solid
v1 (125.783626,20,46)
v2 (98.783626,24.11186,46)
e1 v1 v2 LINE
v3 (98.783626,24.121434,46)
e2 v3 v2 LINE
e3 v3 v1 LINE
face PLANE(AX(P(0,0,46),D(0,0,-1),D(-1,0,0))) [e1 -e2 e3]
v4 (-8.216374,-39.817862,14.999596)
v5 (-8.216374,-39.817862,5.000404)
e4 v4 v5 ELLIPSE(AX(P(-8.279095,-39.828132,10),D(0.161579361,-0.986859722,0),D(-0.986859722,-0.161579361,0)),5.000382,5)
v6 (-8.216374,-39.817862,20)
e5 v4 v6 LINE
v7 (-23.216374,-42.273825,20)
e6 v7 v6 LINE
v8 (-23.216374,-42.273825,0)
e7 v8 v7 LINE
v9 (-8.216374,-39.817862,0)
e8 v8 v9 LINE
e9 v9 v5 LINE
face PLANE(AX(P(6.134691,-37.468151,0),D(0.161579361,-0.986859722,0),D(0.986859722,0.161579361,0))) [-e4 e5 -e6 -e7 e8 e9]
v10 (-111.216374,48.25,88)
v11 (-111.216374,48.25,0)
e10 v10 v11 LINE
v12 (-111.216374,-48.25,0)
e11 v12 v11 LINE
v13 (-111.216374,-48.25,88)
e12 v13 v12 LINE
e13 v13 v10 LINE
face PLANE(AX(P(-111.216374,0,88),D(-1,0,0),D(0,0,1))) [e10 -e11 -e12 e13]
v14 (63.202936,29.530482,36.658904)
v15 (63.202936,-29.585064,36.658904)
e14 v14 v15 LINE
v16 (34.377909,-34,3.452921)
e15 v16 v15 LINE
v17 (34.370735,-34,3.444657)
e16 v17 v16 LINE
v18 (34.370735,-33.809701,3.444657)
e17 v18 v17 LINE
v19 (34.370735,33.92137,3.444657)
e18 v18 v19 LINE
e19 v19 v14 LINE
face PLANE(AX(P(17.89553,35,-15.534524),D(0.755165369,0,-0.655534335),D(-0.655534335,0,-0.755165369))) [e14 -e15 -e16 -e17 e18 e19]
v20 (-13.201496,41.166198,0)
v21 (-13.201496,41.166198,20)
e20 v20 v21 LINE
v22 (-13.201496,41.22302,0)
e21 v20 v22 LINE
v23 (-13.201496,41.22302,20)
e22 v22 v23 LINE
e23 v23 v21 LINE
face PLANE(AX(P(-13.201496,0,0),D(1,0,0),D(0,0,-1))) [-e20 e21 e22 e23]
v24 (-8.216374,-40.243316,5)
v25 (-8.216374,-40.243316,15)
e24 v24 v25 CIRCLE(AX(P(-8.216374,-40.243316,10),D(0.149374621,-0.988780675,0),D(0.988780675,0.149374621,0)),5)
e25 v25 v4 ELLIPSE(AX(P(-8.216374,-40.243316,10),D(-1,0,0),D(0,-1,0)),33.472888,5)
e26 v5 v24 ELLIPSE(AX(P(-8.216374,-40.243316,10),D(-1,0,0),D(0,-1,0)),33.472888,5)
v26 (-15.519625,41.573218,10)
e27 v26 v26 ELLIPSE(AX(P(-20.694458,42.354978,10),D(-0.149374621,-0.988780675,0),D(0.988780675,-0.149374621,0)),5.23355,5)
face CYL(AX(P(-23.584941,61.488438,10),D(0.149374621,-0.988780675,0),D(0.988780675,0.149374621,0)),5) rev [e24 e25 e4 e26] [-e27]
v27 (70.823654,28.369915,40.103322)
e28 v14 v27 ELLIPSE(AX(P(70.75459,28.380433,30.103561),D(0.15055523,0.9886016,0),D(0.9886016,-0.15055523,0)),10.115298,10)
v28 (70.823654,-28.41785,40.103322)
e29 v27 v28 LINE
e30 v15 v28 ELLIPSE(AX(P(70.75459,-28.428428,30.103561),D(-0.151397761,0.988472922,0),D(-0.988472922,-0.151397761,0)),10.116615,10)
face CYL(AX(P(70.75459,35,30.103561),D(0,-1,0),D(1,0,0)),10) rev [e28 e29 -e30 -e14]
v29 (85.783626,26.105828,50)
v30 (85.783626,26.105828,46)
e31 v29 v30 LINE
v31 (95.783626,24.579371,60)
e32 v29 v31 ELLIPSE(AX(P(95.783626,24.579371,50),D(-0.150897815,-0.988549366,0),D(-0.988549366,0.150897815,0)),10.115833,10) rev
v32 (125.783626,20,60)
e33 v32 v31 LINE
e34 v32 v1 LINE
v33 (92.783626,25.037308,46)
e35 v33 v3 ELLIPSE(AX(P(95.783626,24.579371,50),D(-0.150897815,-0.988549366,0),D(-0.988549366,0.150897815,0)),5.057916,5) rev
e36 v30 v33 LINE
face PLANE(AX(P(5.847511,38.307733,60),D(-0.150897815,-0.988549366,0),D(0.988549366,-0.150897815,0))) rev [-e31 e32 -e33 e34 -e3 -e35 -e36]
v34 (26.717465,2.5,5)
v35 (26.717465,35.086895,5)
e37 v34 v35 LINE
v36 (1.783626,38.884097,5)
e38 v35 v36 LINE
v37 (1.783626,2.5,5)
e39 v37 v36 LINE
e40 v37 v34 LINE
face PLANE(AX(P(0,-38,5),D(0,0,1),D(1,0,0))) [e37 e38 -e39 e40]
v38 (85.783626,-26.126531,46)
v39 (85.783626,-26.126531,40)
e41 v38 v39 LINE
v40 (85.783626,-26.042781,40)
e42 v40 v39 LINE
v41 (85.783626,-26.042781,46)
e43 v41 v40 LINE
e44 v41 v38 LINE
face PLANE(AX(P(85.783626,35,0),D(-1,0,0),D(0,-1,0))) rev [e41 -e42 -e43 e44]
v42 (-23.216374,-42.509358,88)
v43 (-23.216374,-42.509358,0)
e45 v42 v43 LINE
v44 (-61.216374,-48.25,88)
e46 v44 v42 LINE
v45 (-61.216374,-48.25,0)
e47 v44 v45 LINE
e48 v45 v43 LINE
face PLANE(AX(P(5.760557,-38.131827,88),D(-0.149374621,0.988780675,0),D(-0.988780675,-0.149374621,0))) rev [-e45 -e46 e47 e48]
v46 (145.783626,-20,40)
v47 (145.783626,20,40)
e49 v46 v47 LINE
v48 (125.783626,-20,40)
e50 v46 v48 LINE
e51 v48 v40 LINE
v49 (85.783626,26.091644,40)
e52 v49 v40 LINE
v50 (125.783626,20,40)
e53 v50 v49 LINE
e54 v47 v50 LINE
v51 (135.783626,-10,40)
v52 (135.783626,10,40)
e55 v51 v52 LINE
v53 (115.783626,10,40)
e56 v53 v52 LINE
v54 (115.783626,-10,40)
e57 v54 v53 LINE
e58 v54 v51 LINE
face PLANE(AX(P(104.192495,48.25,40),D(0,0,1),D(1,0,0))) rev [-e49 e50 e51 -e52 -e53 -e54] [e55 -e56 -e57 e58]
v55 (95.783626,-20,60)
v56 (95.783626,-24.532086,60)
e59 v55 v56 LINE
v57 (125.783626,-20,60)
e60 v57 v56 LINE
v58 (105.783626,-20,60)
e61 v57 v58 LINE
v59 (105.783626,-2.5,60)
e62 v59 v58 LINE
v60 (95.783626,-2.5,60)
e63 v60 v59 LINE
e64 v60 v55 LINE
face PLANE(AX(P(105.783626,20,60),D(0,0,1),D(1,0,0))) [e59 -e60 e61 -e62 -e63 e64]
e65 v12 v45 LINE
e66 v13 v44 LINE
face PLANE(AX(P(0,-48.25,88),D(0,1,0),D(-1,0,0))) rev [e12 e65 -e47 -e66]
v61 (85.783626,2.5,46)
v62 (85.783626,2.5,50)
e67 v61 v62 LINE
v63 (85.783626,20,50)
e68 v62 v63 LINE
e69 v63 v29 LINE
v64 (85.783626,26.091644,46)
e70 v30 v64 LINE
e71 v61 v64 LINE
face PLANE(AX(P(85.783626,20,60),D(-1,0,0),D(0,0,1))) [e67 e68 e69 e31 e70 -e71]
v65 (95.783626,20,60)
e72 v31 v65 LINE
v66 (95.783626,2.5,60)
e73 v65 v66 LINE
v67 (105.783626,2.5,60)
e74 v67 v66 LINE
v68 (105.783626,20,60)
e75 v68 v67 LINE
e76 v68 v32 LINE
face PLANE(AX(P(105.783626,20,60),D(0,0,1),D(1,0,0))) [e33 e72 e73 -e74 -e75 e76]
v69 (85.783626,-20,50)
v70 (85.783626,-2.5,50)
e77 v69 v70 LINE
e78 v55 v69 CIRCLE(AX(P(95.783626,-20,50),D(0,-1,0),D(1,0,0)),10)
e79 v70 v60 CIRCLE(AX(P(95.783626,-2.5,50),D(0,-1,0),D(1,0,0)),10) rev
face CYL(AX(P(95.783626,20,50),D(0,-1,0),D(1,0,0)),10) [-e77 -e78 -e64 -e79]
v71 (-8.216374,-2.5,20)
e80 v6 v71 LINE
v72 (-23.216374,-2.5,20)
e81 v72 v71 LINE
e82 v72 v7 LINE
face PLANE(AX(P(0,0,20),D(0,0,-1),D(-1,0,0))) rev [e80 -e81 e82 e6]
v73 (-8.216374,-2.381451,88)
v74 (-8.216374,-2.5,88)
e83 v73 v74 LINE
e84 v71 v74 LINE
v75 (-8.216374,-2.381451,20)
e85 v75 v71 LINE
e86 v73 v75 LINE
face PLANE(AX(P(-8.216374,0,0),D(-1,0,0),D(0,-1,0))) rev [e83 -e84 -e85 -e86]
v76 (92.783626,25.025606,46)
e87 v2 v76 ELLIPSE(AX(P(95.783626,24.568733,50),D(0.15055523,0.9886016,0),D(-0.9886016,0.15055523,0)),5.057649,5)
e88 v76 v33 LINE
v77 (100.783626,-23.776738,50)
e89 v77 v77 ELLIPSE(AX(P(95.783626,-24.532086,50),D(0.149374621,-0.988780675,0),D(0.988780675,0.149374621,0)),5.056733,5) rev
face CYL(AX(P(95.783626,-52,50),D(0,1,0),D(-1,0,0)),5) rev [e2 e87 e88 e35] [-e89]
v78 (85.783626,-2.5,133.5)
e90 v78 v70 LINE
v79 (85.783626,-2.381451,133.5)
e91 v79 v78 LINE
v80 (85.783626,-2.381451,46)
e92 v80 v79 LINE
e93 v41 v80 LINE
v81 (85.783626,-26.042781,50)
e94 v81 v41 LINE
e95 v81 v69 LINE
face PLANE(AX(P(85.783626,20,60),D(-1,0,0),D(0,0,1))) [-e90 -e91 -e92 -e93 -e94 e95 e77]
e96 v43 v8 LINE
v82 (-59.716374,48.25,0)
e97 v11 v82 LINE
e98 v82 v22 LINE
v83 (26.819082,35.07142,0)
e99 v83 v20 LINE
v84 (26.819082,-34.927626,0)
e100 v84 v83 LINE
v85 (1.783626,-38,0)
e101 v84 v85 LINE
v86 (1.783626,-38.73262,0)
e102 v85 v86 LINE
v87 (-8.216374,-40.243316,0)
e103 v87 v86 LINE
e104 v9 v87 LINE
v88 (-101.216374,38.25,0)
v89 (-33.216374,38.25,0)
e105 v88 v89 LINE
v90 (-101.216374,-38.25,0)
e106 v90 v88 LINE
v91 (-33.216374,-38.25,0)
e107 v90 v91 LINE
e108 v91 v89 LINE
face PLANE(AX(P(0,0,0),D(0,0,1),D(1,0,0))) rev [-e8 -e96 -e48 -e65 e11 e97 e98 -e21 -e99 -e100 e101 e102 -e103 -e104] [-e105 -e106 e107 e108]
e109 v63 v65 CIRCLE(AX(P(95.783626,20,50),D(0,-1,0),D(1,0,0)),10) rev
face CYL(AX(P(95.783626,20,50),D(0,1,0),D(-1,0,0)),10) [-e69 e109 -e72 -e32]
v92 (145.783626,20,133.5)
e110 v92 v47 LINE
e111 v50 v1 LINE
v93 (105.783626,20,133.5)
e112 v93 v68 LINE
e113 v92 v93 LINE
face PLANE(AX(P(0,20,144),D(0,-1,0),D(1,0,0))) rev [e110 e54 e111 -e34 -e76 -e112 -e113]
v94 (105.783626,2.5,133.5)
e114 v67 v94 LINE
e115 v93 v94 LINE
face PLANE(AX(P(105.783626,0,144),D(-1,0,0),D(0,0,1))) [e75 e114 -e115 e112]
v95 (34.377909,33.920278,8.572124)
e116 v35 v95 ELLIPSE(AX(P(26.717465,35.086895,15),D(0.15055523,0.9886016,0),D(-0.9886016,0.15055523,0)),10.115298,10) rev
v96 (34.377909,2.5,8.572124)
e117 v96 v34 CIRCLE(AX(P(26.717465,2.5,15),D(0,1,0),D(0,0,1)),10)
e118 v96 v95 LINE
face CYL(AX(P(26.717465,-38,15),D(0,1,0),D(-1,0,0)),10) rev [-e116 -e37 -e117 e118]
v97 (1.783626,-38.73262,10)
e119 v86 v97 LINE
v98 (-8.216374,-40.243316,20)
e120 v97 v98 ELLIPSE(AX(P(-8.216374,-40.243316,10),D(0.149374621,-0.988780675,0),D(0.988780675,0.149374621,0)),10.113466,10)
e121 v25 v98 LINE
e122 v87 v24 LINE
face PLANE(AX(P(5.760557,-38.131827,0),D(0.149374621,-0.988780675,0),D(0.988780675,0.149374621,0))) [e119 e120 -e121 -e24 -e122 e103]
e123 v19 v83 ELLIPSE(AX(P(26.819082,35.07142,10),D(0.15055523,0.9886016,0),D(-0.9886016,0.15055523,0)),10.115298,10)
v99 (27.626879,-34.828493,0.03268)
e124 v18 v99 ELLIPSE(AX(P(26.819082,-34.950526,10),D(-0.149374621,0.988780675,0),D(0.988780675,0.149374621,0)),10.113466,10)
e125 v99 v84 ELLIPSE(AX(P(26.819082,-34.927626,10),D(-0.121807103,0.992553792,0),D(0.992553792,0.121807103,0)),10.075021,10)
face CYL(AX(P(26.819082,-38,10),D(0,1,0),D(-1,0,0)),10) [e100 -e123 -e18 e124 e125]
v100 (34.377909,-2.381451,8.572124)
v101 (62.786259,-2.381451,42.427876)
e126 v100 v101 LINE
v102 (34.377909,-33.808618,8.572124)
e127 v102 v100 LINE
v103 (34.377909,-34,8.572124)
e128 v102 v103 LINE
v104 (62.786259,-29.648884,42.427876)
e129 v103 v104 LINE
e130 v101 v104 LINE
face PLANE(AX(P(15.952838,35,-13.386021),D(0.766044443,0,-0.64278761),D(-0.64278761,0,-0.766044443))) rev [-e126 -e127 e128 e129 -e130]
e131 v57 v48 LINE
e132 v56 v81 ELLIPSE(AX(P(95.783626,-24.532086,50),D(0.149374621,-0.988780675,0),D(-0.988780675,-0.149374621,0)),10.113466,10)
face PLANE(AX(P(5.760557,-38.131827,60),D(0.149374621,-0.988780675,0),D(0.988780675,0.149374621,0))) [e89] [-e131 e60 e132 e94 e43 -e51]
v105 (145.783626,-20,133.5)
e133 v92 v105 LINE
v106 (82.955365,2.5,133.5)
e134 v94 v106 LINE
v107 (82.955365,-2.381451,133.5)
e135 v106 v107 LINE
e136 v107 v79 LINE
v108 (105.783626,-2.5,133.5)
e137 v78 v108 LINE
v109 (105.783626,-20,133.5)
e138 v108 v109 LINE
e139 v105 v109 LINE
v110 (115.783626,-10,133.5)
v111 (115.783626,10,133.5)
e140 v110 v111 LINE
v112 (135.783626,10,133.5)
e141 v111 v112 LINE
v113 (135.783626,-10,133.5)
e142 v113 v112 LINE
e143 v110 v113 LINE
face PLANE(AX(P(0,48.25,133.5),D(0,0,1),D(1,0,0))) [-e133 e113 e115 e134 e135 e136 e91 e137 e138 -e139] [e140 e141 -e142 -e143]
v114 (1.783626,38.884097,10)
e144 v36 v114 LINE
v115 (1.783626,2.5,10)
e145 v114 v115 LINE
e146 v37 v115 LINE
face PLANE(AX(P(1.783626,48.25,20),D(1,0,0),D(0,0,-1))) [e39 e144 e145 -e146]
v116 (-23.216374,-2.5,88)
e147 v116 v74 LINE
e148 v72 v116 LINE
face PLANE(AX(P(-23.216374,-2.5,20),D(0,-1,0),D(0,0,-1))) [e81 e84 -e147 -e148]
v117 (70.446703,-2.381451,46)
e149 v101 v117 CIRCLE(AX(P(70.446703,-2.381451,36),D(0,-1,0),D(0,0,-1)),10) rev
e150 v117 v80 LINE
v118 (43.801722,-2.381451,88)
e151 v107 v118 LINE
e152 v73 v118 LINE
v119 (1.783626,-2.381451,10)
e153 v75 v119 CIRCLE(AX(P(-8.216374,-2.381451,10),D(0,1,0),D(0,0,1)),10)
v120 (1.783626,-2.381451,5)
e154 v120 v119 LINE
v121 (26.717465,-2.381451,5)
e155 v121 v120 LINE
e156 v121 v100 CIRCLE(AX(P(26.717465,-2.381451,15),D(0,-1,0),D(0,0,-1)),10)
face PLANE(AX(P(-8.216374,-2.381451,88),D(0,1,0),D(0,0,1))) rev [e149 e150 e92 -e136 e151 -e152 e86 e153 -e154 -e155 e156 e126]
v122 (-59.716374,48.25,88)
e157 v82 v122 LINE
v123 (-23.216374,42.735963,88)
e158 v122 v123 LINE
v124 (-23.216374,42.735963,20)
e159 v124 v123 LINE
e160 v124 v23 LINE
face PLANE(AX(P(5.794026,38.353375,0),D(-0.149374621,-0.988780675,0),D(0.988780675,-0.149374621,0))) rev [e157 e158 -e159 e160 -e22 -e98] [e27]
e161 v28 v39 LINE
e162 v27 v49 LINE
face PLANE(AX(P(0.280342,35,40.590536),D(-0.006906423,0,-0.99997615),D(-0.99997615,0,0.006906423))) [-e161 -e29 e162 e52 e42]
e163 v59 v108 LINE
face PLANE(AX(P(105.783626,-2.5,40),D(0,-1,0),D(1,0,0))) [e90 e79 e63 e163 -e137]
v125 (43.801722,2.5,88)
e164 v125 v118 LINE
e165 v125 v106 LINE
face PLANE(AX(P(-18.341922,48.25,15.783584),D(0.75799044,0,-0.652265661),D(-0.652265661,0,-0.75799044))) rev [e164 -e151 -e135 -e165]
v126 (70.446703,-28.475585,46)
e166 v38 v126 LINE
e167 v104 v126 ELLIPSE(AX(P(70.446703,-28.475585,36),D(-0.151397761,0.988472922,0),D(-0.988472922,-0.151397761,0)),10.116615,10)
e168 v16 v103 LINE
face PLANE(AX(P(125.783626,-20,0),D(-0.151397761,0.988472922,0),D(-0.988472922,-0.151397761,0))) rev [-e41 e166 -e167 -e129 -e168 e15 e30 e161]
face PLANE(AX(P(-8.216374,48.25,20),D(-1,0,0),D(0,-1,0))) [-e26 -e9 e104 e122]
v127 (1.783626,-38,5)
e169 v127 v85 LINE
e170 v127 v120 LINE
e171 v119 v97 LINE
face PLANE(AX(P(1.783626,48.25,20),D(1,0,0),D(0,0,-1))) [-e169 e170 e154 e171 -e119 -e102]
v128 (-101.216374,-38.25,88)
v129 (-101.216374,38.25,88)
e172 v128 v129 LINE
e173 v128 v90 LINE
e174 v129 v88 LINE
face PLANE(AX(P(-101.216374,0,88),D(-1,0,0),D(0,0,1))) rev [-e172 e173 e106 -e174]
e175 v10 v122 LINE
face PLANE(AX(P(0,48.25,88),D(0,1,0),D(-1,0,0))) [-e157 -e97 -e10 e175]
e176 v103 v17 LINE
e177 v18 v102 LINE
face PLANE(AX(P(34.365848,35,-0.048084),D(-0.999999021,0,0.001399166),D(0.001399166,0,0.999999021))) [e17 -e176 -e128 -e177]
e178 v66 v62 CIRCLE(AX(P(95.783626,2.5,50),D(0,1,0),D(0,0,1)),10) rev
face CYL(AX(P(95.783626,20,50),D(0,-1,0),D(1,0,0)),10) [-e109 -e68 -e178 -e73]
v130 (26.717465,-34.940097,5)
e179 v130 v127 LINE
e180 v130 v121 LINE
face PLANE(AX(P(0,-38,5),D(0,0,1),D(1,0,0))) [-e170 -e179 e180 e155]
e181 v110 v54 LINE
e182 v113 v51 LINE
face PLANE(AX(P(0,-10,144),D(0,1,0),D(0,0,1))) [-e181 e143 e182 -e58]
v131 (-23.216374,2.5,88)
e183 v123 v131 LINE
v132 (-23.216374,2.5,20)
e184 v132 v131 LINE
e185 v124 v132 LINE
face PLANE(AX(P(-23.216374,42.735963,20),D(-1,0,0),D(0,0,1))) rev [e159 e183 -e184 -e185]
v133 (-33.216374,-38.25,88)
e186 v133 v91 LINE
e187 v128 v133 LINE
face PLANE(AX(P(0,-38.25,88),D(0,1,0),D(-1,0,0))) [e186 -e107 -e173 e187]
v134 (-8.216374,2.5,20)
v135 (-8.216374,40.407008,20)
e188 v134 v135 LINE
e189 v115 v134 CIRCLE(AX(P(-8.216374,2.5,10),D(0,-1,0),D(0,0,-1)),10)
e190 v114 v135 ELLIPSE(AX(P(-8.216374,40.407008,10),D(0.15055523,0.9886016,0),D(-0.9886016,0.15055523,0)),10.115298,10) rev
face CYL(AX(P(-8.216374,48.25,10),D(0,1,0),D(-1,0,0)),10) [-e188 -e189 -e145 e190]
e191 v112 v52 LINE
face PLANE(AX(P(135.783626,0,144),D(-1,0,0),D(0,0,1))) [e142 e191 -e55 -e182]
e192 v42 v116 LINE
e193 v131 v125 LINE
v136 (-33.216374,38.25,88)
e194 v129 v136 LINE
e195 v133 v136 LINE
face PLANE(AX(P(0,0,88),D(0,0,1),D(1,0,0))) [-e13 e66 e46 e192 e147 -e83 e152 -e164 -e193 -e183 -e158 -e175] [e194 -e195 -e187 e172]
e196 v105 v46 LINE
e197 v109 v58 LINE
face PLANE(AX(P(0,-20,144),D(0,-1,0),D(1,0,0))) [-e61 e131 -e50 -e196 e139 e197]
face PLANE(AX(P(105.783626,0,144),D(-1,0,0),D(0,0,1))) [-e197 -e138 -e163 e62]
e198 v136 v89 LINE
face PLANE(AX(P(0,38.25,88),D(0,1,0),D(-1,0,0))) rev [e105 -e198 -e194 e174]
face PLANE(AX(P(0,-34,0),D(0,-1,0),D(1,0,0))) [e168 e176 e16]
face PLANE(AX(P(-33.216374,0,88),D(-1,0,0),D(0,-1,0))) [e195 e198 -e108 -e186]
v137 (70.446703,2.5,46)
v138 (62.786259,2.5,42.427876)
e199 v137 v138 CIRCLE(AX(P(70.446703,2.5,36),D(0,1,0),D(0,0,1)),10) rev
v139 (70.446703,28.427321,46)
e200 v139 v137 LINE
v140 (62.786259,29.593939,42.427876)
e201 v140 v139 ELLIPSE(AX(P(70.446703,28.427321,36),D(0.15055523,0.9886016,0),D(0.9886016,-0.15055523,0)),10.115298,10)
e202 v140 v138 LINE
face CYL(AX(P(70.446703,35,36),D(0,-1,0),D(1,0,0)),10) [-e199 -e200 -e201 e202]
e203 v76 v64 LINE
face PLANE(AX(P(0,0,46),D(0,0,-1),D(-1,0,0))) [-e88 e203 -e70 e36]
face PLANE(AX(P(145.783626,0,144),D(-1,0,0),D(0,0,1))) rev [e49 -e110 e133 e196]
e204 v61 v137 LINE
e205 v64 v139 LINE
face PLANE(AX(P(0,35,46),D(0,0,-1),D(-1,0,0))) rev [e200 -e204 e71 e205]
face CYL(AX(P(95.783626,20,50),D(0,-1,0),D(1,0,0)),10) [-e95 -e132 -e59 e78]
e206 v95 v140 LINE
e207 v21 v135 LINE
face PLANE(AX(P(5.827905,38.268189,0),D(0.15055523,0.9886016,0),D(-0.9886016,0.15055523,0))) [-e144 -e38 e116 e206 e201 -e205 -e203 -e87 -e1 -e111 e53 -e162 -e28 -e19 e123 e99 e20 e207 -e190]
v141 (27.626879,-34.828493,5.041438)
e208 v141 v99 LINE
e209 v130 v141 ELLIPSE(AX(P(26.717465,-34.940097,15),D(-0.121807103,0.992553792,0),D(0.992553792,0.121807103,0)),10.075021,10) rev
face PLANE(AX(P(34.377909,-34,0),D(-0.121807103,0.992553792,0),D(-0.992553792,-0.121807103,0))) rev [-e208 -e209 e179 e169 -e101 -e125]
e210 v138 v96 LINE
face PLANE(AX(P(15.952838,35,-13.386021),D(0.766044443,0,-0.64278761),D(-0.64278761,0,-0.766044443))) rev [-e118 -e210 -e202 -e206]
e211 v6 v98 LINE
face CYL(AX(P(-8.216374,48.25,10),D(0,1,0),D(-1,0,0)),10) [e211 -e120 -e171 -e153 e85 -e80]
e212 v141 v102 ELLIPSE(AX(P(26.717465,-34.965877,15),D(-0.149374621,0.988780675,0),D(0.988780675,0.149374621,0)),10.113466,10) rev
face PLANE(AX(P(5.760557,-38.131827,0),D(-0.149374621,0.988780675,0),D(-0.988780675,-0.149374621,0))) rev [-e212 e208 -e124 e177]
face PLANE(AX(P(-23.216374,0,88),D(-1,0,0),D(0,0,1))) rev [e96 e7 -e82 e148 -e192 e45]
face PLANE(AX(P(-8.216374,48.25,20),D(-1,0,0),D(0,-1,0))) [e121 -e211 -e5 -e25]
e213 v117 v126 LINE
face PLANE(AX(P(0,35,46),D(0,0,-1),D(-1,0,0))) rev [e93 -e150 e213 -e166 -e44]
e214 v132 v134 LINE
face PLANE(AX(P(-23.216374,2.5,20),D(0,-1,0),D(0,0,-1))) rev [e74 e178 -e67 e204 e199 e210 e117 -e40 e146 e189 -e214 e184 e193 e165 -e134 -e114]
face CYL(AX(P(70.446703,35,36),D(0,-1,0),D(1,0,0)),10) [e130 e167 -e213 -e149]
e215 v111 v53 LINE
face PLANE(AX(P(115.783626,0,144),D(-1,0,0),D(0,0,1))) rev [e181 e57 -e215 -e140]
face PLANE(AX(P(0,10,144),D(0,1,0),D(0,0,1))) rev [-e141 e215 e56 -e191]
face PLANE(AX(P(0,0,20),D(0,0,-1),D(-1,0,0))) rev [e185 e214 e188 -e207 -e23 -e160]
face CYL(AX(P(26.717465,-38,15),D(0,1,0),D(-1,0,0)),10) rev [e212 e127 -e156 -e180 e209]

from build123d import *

# Parameters (mm, degrees)
ESQUISSE1_W                   = 68
ESQUISSE1_H                   = 76.5
BOSS_EXTRU_1_DEPTH            = 88
BOSS_EXTRU_4_DEPTH            = 88
ESQUISSE3_W                   = 19.543482411
ESQUISSE3_H                   = 40.235962567
ESQUISSE3_W_2                 = 20.972353068
ESQUISSE3_H_2                 = 40.009358289
ENL_V_MAT_EXTRU_1_DEPTH       = 68
ESQUISSE8_W                   = 10
ESQUISSE8_H                   = 20
BOSS_EXTRU_9_DEPTH            = 96.5
ENL_V_MAT_EXTRU_2_DEPTH       = 140.000518873
ESQUISSE10_R                  = 5
ENL_V_MAT_EXTRU_3_DEPTH       = 170.968886377
ESQUISSE17_W                  = 10
ESQUISSE17_H                  = 4.881451094
BOSS_EXTRU_16_DEPTH           = 68
CONG_2_R                      = 10
BOSS_EXTRU_19_DEPTH           = 56
BOSS_EXTRU_19_DEPTH_BACK      = 85
ESQUISSE19_W                  = 40
ESQUISSE19_H                  = 40
ESQUISSE19_W_2                = 20
ESQUISSE19_H_2                = 20
ESQUISSE20_W                  = 60
ESQUISSE20_H                  = 40
ENL_V_MAT_EXTRU_4_DEPTH       = 216.978999532
ESQUISSE21_W                  = 40
ESQUISSE21_H                  = 10.5
ENL_V_MAT_EXTRU_5_DEPTH       = 216.978999532
ESQUISSE22_W                  = 10
ESQUISSE22_H                  = 20
BOSS_EXTRU_23_DEPTH           = 40
ESQUISSE23_W                  = 10
ESQUISSE23_H                  = 5
BOSS_EXTRU_24_DEPTH           = 93.5
ESQUISSE24_W                  = 10
ESQUISSE24_H                  = 20
BOSS_EXTRU_25_DEPTH           = 40
ESQUISSE25_W                  = 10
ESQUISSE25_H                  = 5
BOSS_EXTRU_26_DEPTH           = 83.5
ESQUISSE26_W                  = 10
ESQUISSE26_H                  = 10
ENL_V_MAT_EXTRU_6_DEPTH       = 211.762136635
CONG_3_R                      = 10
CONG_4_R                      = 10
BOSS_EXTRU_30_DEPTH           = 18
BOSS_EXTRU_30_DEPTH_BACK      = 59
ENL_V_MAT_EXTRU_9_DEPTH       = 180.786479578
BOSS_EXTRU_33_DEPTH           = 20
CONG_8_R                      = 10
ENL_V_MAT_EXTRU_12_DEPTH      = 32
ENL_V_MAT_EXTRU_12_DEPTH_BACK = 210.124791067
ESQUISSE41_R                  = 5
BOSS_EXTRU_34_DEPTH           = 14
BOSS_EXTRU_34_DEPTH_BACK      = 55
ENL_V_MAT_EXTRU_15_DEPTH      = 177.740426159
BOSS_EXTRU_36_REACH           = 178.988
ESQUISSE47_W                  = 84
ESQUISSE47_H                  = 4.881451094
ESQUISSE50_W                  = 75.146765922
ESQUISSE50_H                  = 4.881451094
BOSS_EXTRU_38_DEPTH           = 45.5
ENL_V_MAT_EXTRU_16_DEPTH      = 220.971283896


with BuildPart() as part:
    # Esquisse1 → Boss.-Extru.1 (new body)
    with BuildSketch(Plane.XY):
        Polygon((-111.216373557, -48.25), (-61.216373557, -48.25), (-23.216373557, -42.509358289), (-23.216373557, 42.509358289), (-61.216373557, 48.25), (-111.216373557, 48.25), align=None)
        with Locations((-67.216373557, 0)):
            Rectangle(ESQUISSE1_W, ESQUISSE1_H, mode=Mode.SUBTRACT)
    extrude(amount=BOSS_EXTRU_1_DEPTH)

    # Esquisse2 → Boss.-Extru.4 (add)
    with BuildSketch(Plane.XY.offset(88)):
        Polygon((-8.216373557, 40.469919786), (-59.716373557, 48.25), (-61.216373557, 48.25), (-23.216373557, 42.509358289), (-23.216373557, -42.27382473), (-8.216373557, -39.817862291), align=None)
    extrude(amount=-BOSS_EXTRU_4_DEPTH)

    # Esquisse3 → Enlèv. mat.-Extru.1 (cut)
    with BuildSketch(Plane.XY.offset(88)):
        with Locations((-13.444632352, 22.617981284)):
            Rectangle(ESQUISSE3_W, ESQUISSE3_H)
        with Locations((-12.730197023, -22.504679145)):
            Rectangle(ESQUISSE3_W_2, ESQUISSE3_H_2)
    extrude(amount=-ENL_V_MAT_EXTRU_1_DEPTH, mode=Mode.SUBTRACT)

    # Esquisse8 → Boss.-Extru.9 (add, through all)
    with BuildSketch(Plane.XZ.offset(48.25)):
        with Locations((-3.216373557, 10)):
            Rectangle(ESQUISSE8_W, ESQUISSE8_H)
    extrude(amount=-BOSS_EXTRU_9_DEPTH)

    # Esquisse9 → Enlèv. mat.-Extru.2 (cut, through all)
    with BuildSketch(Plane.XY.offset(20)):
        Polygon((-8.216373557, 48.25), (-8.216373557, 40.469919786), (1.783626443, 38.959224599), (1.783626443, 48.25), align=None)
        Polygon((1.783626443, -48.25), (1.783626443, -38.732620321), (-8.216373557, -40.243315508), (-8.216373557, -48.25), align=None)
    extrude(amount=-ENL_V_MAT_EXTRU_2_DEPTH, mode=Mode.SUBTRACT)

    # Esquisse10 → Enlèv. mat.-Extru.3 (cut, through all)
    with BuildSketch(Plane(origin=(5.760556808, -38.131827365, 0), x_dir=(-0.9887806747234926, -0.149374620646731, 0), z_dir=(0.14937462064673096, -0.9887806747234925, 0))):
        with Locations(Location((14.135521377, -10, 0), (0, 0, 180))):
            Circle(ESQUISSE10_R)
    extrude(amount=-ENL_V_MAT_EXTRU_3_DEPTH, mode=Mode.SUBTRACT)

    # Esquisse17 → Boss.-Extru.16 (add, through all)
    with BuildSketch(Plane.XY.offset(20)):
        with Locations((-3.216373557, 0.059274453)):
            Rectangle(ESQUISSE17_W, ESQUISSE17_H)
    extrude(amount=BOSS_EXTRU_16_DEPTH)

    # Congé2
    cong_2_edges = [part.edges().sort_by_distance(p)[0] for p in [
        (1.783626443, 20.729612299, 20),
        (1.783626443, -20.557035707, 20),
    ]]
    fillet(cong_2_edges, radius=CONG_2_R - 0.0001)  # a hair under: the kernel refuses the full size

    # Esquisse34 → Boss.-Extru.30 (add, two sides: drawn at the far end of the back side and taken through both)
    with BuildSketch(Plane.XZ.offset(20).offset(-BOSS_EXTRU_30_DEPTH_BACK)):
        with BuildLine():
            Line((34.377909415, 8.572123903), (34.370735232, 3.444656645))
            ThreePointArc((34.370735232, 3.444656645), (30.969175902, 0.901828933), (26.819081539, 0))
            Line((26.819081539, 0), (1.783626443, 0))
            Line((1.783626443, 0), (1.783626443, 5))
            Line((1.783626443, 5), (26.717464984, 5))
            ThreePointArc((26.717464984, 5), (30.943647601, 5.93692213), (34.377909415, 8.572123903))
        make_face()
    extrude(amount=BOSS_EXTRU_30_DEPTH + BOSS_EXTRU_30_DEPTH_BACK)

    # Esquisse35 → Enlèv. mat.-Extru.9 (cut, through all)
    with BuildSketch(Plane(origin=(0, 0, 40), x_dir=(-1, 0, 0), z_dir=(0, 0, -1))):
        Polygon((0, -39.002071909), (-46.91486771, -31.914665424), (-9.768949851, -63.05793836), align=None)
        Polygon((-56.81735982, 58.483787391), (-46.91486771, 32.011010427), (13.201496413, 41.166197955), (13.201496413, 63.711388499), align=None)
    extrude(amount=ENL_V_MAT_EXTRU_9_DEPTH, mode=Mode.SUBTRACT)



with BuildPart() as body_2:
    # Esquisse19 → Boss.-Extru.19 (new, two sides: drawn at the far end of the back side and taken through both)
    with BuildSketch(Plane.XY.offset(88).offset(-BOSS_EXTRU_19_DEPTH_BACK)):
        with Locations((125.783626443, 0)):
            Rectangle(ESQUISSE19_W, ESQUISSE19_H)
        with Locations((125.783626443, 0)):
            Rectangle(ESQUISSE19_W_2, ESQUISSE19_H_2, mode=Mode.SUBTRACT)
    extrude(amount=BOSS_EXTRU_19_DEPTH + BOSS_EXTRU_19_DEPTH_BACK)

    # Esquisse20 → Enlèv. mat.-Extru.4 (cut, through all)
    with BuildSketch(Plane.XZ.offset(20)):
        with Locations((134.192494857, 20)):
            Rectangle(ESQUISSE20_W, ESQUISSE20_H)
    extrude(amount=-ENL_V_MAT_EXTRU_4_DEPTH, mode=Mode.SUBTRACT)

    # Esquisse21 → Enlèv. mat.-Extru.5 (cut, through all)
    with BuildSketch(Plane.XZ.offset(20)):
        with Locations((125.783626443, 138.75)):
            Rectangle(ESQUISSE21_W, ESQUISSE21_H)
    extrude(amount=-ENL_V_MAT_EXTRU_5_DEPTH, mode=Mode.SUBTRACT)

    # Esquisse22 → Boss.-Extru.23 (add)
    with BuildSketch(Plane.XZ.offset(20)):
        with Locations((100.783626443, 50)):
            Rectangle(ESQUISSE22_W, ESQUISSE22_H)
    extrude(amount=-BOSS_EXTRU_23_DEPTH)

    # Esquisse23 → Boss.-Extru.24 (add)
    with BuildSketch(Plane.XY.offset(133.5)):
        with Locations((100.783626443, 0)):
            Rectangle(ESQUISSE23_W, ESQUISSE23_H)
    extrude(amount=-BOSS_EXTRU_24_DEPTH)

    # Esquisse24 → Boss.-Extru.25 (add)
    with BuildSketch(Plane.XZ.offset(20)):
        with Locations((90.783626443, 50)):
            Rectangle(ESQUISSE24_W, ESQUISSE24_H)
    extrude(amount=-BOSS_EXTRU_25_DEPTH)

    # Esquisse25 → Boss.-Extru.26 (add)
    with BuildSketch(Plane.XY.offset(60)):
        with Locations((90.783626443, 0)):
            Rectangle(ESQUISSE25_W, ESQUISSE25_H)
    extrude(amount=BOSS_EXTRU_26_DEPTH)

    # Esquisse26 → Enlèv. mat.-Extru.6 (cut, through all)
    with BuildSketch(Plane.XZ.offset(2.5)):
        with Locations((90.783626443, 138.5)):
            Rectangle(ESQUISSE26_W, ESQUISSE26_H)
    extrude(amount=-ENL_V_MAT_EXTRU_6_DEPTH, mode=Mode.SUBTRACT)

    # Congé3
    cong_3_edges = [body_2.edges().sort_by_distance(p)[0] for p in [
        (85.783626443, -11.25, 60),
    ]]
    fillet(cong_3_edges, radius=CONG_3_R)

    # Congé4
    cong_4_edges = [body_2.edges().sort_by_distance(p)[0] for p in [
        (85.783626443, 11.25, 60),
    ]]
    fillet(cong_4_edges, radius=CONG_4_R)

    # Esquisse40 → Boss.-Extru.33 (add)
    with BuildSketch(Plane(origin=(0, 0, 40), x_dir=(-1, 0, 0), z_dir=(0, 0, -1))):
        Polygon((-85.783626443, -20), (-125.783626443, -20), (-85.783626443, -26.042780749), align=None)
        Polygon((-85.783626443, 26.105828189), (-125.783626443, 20), (-85.783626443, 20), align=None)
    extrude(amount=-BOSS_EXTRU_33_DEPTH)

    # Congé8
    cong_8_edges = [body_2.edges().sort_by_distance(p)[0] for p in [
        (85.783626443, -23.021390374, 60),
        (85.783626443, 23.052914094, 60),
    ]]
    fillet(cong_8_edges, radius=CONG_8_R)

    # Esquisse41 → Enlèv. mat.-Extru.12 (cut, two sides: drawn at the far end of the back side and taken through both)
    with BuildSketch(Plane.XZ.offset(20).offset(-ENL_V_MAT_EXTRU_12_DEPTH_BACK)):
        with Locations(Location((95.783626443, 50, 0), (0, 0, 180))):
            Circle(ESQUISSE41_R)
    extrude(amount=ENL_V_MAT_EXTRU_12_DEPTH + ENL_V_MAT_EXTRU_12_DEPTH_BACK, mode=Mode.SUBTRACT)


with BuildPart() as part_1:
    add(part.part)

    add(body_2.part)  # Boss.-Extru.34 merges body 2
    # Esquisse42 → Boss.-Extru.34 (add, two sides: drawn at the far end of the back side and taken through both)
    with BuildSketch(Plane.XZ.offset(20).offset(-BOSS_EXTRU_34_DEPTH_BACK)):
        with BuildLine():
            Line((85.783626443, 46), (70.446703025, 46))
            ThreePointArc((70.446703025, 46), (66.220520407, 45.06307787), (62.786258594, 42.427876097))
            Line((62.786258594, 42.427876097), (34.377909415, 8.572123903))
            Line((34.377909415, 8.572123903), (34.370735232, 3.444656645))
            Line((34.370735232, 3.444656645), (63.202936222, 36.658904216))
            ThreePointArc((63.202936222, 36.658904216), (66.635938394, 39.216008921), (70.823654148, 40.103322365))
            Line((70.823654148, 40.103322365), (85.783626443, 40))
            Line((85.783626443, 40), (85.783626443, 46))
        make_face()
    extrude(amount=BOSS_EXTRU_34_DEPTH + BOSS_EXTRU_34_DEPTH_BACK)

    # Esquisse46 → Enlèv. mat.-Extru.15 (cut, through all)
    with BuildSketch(Plane.XY.offset(46)):
        Polygon((125.783626443, 20), (1.783626443, 38.884097035), (91.450217157, 42.474258999), align=None)
        Polygon((125.783626443, -20), (34.377909415, -34), (1.783626443, -38), (94.864318468, -42.795104314), align=None)
    extrude(amount=-ENL_V_MAT_EXTRU_15_DEPTH, mode=Mode.SUBTRACT)

    # Esquisse47 → Boss.-Extru.36 (add, up to next)
    with BuildSketch(Plane.XY.offset(88), mode=Mode.PRIVATE) as boss_extru_36_sk1:
        with Locations((43.783626443, 0.059274453)):
            Rectangle(ESQUISSE47_W, ESQUISSE47_H)
    boss_extru_36_tool1 = extrude(boss_extru_36_sk1.sketch, amount=-BOSS_EXTRU_36_REACH, mode=Mode.PRIVATE) - part_1.part
    add(boss_extru_36_tool1.solids().sort_by_distance((43.783626, 0.059274, 88))[0])

    # Esquisse50 → Boss.-Extru.38 (add, through all)
    with BuildSketch(Plane.XY.offset(88)):
        with Locations((48.32250802, 0.059274453)):
            Rectangle(ESQUISSE50_W, ESQUISSE50_H)
    extrude(amount=BOSS_EXTRU_38_DEPTH)

    # Esquisse51 → Enlèv. mat.-Extru.16 (cut, through all)
    with BuildSketch(Plane.XZ.offset(48.25)):
        Polygon((82.955365358, 133.5), (10.749125059, 133.5), (10.749125059, 88), (43.801721697, 88), align=None)
    extrude(amount=-ENL_V_MAT_EXTRU_16_DEPTH, mode=Mode.SUBTRACT)


solid = part_1.part
